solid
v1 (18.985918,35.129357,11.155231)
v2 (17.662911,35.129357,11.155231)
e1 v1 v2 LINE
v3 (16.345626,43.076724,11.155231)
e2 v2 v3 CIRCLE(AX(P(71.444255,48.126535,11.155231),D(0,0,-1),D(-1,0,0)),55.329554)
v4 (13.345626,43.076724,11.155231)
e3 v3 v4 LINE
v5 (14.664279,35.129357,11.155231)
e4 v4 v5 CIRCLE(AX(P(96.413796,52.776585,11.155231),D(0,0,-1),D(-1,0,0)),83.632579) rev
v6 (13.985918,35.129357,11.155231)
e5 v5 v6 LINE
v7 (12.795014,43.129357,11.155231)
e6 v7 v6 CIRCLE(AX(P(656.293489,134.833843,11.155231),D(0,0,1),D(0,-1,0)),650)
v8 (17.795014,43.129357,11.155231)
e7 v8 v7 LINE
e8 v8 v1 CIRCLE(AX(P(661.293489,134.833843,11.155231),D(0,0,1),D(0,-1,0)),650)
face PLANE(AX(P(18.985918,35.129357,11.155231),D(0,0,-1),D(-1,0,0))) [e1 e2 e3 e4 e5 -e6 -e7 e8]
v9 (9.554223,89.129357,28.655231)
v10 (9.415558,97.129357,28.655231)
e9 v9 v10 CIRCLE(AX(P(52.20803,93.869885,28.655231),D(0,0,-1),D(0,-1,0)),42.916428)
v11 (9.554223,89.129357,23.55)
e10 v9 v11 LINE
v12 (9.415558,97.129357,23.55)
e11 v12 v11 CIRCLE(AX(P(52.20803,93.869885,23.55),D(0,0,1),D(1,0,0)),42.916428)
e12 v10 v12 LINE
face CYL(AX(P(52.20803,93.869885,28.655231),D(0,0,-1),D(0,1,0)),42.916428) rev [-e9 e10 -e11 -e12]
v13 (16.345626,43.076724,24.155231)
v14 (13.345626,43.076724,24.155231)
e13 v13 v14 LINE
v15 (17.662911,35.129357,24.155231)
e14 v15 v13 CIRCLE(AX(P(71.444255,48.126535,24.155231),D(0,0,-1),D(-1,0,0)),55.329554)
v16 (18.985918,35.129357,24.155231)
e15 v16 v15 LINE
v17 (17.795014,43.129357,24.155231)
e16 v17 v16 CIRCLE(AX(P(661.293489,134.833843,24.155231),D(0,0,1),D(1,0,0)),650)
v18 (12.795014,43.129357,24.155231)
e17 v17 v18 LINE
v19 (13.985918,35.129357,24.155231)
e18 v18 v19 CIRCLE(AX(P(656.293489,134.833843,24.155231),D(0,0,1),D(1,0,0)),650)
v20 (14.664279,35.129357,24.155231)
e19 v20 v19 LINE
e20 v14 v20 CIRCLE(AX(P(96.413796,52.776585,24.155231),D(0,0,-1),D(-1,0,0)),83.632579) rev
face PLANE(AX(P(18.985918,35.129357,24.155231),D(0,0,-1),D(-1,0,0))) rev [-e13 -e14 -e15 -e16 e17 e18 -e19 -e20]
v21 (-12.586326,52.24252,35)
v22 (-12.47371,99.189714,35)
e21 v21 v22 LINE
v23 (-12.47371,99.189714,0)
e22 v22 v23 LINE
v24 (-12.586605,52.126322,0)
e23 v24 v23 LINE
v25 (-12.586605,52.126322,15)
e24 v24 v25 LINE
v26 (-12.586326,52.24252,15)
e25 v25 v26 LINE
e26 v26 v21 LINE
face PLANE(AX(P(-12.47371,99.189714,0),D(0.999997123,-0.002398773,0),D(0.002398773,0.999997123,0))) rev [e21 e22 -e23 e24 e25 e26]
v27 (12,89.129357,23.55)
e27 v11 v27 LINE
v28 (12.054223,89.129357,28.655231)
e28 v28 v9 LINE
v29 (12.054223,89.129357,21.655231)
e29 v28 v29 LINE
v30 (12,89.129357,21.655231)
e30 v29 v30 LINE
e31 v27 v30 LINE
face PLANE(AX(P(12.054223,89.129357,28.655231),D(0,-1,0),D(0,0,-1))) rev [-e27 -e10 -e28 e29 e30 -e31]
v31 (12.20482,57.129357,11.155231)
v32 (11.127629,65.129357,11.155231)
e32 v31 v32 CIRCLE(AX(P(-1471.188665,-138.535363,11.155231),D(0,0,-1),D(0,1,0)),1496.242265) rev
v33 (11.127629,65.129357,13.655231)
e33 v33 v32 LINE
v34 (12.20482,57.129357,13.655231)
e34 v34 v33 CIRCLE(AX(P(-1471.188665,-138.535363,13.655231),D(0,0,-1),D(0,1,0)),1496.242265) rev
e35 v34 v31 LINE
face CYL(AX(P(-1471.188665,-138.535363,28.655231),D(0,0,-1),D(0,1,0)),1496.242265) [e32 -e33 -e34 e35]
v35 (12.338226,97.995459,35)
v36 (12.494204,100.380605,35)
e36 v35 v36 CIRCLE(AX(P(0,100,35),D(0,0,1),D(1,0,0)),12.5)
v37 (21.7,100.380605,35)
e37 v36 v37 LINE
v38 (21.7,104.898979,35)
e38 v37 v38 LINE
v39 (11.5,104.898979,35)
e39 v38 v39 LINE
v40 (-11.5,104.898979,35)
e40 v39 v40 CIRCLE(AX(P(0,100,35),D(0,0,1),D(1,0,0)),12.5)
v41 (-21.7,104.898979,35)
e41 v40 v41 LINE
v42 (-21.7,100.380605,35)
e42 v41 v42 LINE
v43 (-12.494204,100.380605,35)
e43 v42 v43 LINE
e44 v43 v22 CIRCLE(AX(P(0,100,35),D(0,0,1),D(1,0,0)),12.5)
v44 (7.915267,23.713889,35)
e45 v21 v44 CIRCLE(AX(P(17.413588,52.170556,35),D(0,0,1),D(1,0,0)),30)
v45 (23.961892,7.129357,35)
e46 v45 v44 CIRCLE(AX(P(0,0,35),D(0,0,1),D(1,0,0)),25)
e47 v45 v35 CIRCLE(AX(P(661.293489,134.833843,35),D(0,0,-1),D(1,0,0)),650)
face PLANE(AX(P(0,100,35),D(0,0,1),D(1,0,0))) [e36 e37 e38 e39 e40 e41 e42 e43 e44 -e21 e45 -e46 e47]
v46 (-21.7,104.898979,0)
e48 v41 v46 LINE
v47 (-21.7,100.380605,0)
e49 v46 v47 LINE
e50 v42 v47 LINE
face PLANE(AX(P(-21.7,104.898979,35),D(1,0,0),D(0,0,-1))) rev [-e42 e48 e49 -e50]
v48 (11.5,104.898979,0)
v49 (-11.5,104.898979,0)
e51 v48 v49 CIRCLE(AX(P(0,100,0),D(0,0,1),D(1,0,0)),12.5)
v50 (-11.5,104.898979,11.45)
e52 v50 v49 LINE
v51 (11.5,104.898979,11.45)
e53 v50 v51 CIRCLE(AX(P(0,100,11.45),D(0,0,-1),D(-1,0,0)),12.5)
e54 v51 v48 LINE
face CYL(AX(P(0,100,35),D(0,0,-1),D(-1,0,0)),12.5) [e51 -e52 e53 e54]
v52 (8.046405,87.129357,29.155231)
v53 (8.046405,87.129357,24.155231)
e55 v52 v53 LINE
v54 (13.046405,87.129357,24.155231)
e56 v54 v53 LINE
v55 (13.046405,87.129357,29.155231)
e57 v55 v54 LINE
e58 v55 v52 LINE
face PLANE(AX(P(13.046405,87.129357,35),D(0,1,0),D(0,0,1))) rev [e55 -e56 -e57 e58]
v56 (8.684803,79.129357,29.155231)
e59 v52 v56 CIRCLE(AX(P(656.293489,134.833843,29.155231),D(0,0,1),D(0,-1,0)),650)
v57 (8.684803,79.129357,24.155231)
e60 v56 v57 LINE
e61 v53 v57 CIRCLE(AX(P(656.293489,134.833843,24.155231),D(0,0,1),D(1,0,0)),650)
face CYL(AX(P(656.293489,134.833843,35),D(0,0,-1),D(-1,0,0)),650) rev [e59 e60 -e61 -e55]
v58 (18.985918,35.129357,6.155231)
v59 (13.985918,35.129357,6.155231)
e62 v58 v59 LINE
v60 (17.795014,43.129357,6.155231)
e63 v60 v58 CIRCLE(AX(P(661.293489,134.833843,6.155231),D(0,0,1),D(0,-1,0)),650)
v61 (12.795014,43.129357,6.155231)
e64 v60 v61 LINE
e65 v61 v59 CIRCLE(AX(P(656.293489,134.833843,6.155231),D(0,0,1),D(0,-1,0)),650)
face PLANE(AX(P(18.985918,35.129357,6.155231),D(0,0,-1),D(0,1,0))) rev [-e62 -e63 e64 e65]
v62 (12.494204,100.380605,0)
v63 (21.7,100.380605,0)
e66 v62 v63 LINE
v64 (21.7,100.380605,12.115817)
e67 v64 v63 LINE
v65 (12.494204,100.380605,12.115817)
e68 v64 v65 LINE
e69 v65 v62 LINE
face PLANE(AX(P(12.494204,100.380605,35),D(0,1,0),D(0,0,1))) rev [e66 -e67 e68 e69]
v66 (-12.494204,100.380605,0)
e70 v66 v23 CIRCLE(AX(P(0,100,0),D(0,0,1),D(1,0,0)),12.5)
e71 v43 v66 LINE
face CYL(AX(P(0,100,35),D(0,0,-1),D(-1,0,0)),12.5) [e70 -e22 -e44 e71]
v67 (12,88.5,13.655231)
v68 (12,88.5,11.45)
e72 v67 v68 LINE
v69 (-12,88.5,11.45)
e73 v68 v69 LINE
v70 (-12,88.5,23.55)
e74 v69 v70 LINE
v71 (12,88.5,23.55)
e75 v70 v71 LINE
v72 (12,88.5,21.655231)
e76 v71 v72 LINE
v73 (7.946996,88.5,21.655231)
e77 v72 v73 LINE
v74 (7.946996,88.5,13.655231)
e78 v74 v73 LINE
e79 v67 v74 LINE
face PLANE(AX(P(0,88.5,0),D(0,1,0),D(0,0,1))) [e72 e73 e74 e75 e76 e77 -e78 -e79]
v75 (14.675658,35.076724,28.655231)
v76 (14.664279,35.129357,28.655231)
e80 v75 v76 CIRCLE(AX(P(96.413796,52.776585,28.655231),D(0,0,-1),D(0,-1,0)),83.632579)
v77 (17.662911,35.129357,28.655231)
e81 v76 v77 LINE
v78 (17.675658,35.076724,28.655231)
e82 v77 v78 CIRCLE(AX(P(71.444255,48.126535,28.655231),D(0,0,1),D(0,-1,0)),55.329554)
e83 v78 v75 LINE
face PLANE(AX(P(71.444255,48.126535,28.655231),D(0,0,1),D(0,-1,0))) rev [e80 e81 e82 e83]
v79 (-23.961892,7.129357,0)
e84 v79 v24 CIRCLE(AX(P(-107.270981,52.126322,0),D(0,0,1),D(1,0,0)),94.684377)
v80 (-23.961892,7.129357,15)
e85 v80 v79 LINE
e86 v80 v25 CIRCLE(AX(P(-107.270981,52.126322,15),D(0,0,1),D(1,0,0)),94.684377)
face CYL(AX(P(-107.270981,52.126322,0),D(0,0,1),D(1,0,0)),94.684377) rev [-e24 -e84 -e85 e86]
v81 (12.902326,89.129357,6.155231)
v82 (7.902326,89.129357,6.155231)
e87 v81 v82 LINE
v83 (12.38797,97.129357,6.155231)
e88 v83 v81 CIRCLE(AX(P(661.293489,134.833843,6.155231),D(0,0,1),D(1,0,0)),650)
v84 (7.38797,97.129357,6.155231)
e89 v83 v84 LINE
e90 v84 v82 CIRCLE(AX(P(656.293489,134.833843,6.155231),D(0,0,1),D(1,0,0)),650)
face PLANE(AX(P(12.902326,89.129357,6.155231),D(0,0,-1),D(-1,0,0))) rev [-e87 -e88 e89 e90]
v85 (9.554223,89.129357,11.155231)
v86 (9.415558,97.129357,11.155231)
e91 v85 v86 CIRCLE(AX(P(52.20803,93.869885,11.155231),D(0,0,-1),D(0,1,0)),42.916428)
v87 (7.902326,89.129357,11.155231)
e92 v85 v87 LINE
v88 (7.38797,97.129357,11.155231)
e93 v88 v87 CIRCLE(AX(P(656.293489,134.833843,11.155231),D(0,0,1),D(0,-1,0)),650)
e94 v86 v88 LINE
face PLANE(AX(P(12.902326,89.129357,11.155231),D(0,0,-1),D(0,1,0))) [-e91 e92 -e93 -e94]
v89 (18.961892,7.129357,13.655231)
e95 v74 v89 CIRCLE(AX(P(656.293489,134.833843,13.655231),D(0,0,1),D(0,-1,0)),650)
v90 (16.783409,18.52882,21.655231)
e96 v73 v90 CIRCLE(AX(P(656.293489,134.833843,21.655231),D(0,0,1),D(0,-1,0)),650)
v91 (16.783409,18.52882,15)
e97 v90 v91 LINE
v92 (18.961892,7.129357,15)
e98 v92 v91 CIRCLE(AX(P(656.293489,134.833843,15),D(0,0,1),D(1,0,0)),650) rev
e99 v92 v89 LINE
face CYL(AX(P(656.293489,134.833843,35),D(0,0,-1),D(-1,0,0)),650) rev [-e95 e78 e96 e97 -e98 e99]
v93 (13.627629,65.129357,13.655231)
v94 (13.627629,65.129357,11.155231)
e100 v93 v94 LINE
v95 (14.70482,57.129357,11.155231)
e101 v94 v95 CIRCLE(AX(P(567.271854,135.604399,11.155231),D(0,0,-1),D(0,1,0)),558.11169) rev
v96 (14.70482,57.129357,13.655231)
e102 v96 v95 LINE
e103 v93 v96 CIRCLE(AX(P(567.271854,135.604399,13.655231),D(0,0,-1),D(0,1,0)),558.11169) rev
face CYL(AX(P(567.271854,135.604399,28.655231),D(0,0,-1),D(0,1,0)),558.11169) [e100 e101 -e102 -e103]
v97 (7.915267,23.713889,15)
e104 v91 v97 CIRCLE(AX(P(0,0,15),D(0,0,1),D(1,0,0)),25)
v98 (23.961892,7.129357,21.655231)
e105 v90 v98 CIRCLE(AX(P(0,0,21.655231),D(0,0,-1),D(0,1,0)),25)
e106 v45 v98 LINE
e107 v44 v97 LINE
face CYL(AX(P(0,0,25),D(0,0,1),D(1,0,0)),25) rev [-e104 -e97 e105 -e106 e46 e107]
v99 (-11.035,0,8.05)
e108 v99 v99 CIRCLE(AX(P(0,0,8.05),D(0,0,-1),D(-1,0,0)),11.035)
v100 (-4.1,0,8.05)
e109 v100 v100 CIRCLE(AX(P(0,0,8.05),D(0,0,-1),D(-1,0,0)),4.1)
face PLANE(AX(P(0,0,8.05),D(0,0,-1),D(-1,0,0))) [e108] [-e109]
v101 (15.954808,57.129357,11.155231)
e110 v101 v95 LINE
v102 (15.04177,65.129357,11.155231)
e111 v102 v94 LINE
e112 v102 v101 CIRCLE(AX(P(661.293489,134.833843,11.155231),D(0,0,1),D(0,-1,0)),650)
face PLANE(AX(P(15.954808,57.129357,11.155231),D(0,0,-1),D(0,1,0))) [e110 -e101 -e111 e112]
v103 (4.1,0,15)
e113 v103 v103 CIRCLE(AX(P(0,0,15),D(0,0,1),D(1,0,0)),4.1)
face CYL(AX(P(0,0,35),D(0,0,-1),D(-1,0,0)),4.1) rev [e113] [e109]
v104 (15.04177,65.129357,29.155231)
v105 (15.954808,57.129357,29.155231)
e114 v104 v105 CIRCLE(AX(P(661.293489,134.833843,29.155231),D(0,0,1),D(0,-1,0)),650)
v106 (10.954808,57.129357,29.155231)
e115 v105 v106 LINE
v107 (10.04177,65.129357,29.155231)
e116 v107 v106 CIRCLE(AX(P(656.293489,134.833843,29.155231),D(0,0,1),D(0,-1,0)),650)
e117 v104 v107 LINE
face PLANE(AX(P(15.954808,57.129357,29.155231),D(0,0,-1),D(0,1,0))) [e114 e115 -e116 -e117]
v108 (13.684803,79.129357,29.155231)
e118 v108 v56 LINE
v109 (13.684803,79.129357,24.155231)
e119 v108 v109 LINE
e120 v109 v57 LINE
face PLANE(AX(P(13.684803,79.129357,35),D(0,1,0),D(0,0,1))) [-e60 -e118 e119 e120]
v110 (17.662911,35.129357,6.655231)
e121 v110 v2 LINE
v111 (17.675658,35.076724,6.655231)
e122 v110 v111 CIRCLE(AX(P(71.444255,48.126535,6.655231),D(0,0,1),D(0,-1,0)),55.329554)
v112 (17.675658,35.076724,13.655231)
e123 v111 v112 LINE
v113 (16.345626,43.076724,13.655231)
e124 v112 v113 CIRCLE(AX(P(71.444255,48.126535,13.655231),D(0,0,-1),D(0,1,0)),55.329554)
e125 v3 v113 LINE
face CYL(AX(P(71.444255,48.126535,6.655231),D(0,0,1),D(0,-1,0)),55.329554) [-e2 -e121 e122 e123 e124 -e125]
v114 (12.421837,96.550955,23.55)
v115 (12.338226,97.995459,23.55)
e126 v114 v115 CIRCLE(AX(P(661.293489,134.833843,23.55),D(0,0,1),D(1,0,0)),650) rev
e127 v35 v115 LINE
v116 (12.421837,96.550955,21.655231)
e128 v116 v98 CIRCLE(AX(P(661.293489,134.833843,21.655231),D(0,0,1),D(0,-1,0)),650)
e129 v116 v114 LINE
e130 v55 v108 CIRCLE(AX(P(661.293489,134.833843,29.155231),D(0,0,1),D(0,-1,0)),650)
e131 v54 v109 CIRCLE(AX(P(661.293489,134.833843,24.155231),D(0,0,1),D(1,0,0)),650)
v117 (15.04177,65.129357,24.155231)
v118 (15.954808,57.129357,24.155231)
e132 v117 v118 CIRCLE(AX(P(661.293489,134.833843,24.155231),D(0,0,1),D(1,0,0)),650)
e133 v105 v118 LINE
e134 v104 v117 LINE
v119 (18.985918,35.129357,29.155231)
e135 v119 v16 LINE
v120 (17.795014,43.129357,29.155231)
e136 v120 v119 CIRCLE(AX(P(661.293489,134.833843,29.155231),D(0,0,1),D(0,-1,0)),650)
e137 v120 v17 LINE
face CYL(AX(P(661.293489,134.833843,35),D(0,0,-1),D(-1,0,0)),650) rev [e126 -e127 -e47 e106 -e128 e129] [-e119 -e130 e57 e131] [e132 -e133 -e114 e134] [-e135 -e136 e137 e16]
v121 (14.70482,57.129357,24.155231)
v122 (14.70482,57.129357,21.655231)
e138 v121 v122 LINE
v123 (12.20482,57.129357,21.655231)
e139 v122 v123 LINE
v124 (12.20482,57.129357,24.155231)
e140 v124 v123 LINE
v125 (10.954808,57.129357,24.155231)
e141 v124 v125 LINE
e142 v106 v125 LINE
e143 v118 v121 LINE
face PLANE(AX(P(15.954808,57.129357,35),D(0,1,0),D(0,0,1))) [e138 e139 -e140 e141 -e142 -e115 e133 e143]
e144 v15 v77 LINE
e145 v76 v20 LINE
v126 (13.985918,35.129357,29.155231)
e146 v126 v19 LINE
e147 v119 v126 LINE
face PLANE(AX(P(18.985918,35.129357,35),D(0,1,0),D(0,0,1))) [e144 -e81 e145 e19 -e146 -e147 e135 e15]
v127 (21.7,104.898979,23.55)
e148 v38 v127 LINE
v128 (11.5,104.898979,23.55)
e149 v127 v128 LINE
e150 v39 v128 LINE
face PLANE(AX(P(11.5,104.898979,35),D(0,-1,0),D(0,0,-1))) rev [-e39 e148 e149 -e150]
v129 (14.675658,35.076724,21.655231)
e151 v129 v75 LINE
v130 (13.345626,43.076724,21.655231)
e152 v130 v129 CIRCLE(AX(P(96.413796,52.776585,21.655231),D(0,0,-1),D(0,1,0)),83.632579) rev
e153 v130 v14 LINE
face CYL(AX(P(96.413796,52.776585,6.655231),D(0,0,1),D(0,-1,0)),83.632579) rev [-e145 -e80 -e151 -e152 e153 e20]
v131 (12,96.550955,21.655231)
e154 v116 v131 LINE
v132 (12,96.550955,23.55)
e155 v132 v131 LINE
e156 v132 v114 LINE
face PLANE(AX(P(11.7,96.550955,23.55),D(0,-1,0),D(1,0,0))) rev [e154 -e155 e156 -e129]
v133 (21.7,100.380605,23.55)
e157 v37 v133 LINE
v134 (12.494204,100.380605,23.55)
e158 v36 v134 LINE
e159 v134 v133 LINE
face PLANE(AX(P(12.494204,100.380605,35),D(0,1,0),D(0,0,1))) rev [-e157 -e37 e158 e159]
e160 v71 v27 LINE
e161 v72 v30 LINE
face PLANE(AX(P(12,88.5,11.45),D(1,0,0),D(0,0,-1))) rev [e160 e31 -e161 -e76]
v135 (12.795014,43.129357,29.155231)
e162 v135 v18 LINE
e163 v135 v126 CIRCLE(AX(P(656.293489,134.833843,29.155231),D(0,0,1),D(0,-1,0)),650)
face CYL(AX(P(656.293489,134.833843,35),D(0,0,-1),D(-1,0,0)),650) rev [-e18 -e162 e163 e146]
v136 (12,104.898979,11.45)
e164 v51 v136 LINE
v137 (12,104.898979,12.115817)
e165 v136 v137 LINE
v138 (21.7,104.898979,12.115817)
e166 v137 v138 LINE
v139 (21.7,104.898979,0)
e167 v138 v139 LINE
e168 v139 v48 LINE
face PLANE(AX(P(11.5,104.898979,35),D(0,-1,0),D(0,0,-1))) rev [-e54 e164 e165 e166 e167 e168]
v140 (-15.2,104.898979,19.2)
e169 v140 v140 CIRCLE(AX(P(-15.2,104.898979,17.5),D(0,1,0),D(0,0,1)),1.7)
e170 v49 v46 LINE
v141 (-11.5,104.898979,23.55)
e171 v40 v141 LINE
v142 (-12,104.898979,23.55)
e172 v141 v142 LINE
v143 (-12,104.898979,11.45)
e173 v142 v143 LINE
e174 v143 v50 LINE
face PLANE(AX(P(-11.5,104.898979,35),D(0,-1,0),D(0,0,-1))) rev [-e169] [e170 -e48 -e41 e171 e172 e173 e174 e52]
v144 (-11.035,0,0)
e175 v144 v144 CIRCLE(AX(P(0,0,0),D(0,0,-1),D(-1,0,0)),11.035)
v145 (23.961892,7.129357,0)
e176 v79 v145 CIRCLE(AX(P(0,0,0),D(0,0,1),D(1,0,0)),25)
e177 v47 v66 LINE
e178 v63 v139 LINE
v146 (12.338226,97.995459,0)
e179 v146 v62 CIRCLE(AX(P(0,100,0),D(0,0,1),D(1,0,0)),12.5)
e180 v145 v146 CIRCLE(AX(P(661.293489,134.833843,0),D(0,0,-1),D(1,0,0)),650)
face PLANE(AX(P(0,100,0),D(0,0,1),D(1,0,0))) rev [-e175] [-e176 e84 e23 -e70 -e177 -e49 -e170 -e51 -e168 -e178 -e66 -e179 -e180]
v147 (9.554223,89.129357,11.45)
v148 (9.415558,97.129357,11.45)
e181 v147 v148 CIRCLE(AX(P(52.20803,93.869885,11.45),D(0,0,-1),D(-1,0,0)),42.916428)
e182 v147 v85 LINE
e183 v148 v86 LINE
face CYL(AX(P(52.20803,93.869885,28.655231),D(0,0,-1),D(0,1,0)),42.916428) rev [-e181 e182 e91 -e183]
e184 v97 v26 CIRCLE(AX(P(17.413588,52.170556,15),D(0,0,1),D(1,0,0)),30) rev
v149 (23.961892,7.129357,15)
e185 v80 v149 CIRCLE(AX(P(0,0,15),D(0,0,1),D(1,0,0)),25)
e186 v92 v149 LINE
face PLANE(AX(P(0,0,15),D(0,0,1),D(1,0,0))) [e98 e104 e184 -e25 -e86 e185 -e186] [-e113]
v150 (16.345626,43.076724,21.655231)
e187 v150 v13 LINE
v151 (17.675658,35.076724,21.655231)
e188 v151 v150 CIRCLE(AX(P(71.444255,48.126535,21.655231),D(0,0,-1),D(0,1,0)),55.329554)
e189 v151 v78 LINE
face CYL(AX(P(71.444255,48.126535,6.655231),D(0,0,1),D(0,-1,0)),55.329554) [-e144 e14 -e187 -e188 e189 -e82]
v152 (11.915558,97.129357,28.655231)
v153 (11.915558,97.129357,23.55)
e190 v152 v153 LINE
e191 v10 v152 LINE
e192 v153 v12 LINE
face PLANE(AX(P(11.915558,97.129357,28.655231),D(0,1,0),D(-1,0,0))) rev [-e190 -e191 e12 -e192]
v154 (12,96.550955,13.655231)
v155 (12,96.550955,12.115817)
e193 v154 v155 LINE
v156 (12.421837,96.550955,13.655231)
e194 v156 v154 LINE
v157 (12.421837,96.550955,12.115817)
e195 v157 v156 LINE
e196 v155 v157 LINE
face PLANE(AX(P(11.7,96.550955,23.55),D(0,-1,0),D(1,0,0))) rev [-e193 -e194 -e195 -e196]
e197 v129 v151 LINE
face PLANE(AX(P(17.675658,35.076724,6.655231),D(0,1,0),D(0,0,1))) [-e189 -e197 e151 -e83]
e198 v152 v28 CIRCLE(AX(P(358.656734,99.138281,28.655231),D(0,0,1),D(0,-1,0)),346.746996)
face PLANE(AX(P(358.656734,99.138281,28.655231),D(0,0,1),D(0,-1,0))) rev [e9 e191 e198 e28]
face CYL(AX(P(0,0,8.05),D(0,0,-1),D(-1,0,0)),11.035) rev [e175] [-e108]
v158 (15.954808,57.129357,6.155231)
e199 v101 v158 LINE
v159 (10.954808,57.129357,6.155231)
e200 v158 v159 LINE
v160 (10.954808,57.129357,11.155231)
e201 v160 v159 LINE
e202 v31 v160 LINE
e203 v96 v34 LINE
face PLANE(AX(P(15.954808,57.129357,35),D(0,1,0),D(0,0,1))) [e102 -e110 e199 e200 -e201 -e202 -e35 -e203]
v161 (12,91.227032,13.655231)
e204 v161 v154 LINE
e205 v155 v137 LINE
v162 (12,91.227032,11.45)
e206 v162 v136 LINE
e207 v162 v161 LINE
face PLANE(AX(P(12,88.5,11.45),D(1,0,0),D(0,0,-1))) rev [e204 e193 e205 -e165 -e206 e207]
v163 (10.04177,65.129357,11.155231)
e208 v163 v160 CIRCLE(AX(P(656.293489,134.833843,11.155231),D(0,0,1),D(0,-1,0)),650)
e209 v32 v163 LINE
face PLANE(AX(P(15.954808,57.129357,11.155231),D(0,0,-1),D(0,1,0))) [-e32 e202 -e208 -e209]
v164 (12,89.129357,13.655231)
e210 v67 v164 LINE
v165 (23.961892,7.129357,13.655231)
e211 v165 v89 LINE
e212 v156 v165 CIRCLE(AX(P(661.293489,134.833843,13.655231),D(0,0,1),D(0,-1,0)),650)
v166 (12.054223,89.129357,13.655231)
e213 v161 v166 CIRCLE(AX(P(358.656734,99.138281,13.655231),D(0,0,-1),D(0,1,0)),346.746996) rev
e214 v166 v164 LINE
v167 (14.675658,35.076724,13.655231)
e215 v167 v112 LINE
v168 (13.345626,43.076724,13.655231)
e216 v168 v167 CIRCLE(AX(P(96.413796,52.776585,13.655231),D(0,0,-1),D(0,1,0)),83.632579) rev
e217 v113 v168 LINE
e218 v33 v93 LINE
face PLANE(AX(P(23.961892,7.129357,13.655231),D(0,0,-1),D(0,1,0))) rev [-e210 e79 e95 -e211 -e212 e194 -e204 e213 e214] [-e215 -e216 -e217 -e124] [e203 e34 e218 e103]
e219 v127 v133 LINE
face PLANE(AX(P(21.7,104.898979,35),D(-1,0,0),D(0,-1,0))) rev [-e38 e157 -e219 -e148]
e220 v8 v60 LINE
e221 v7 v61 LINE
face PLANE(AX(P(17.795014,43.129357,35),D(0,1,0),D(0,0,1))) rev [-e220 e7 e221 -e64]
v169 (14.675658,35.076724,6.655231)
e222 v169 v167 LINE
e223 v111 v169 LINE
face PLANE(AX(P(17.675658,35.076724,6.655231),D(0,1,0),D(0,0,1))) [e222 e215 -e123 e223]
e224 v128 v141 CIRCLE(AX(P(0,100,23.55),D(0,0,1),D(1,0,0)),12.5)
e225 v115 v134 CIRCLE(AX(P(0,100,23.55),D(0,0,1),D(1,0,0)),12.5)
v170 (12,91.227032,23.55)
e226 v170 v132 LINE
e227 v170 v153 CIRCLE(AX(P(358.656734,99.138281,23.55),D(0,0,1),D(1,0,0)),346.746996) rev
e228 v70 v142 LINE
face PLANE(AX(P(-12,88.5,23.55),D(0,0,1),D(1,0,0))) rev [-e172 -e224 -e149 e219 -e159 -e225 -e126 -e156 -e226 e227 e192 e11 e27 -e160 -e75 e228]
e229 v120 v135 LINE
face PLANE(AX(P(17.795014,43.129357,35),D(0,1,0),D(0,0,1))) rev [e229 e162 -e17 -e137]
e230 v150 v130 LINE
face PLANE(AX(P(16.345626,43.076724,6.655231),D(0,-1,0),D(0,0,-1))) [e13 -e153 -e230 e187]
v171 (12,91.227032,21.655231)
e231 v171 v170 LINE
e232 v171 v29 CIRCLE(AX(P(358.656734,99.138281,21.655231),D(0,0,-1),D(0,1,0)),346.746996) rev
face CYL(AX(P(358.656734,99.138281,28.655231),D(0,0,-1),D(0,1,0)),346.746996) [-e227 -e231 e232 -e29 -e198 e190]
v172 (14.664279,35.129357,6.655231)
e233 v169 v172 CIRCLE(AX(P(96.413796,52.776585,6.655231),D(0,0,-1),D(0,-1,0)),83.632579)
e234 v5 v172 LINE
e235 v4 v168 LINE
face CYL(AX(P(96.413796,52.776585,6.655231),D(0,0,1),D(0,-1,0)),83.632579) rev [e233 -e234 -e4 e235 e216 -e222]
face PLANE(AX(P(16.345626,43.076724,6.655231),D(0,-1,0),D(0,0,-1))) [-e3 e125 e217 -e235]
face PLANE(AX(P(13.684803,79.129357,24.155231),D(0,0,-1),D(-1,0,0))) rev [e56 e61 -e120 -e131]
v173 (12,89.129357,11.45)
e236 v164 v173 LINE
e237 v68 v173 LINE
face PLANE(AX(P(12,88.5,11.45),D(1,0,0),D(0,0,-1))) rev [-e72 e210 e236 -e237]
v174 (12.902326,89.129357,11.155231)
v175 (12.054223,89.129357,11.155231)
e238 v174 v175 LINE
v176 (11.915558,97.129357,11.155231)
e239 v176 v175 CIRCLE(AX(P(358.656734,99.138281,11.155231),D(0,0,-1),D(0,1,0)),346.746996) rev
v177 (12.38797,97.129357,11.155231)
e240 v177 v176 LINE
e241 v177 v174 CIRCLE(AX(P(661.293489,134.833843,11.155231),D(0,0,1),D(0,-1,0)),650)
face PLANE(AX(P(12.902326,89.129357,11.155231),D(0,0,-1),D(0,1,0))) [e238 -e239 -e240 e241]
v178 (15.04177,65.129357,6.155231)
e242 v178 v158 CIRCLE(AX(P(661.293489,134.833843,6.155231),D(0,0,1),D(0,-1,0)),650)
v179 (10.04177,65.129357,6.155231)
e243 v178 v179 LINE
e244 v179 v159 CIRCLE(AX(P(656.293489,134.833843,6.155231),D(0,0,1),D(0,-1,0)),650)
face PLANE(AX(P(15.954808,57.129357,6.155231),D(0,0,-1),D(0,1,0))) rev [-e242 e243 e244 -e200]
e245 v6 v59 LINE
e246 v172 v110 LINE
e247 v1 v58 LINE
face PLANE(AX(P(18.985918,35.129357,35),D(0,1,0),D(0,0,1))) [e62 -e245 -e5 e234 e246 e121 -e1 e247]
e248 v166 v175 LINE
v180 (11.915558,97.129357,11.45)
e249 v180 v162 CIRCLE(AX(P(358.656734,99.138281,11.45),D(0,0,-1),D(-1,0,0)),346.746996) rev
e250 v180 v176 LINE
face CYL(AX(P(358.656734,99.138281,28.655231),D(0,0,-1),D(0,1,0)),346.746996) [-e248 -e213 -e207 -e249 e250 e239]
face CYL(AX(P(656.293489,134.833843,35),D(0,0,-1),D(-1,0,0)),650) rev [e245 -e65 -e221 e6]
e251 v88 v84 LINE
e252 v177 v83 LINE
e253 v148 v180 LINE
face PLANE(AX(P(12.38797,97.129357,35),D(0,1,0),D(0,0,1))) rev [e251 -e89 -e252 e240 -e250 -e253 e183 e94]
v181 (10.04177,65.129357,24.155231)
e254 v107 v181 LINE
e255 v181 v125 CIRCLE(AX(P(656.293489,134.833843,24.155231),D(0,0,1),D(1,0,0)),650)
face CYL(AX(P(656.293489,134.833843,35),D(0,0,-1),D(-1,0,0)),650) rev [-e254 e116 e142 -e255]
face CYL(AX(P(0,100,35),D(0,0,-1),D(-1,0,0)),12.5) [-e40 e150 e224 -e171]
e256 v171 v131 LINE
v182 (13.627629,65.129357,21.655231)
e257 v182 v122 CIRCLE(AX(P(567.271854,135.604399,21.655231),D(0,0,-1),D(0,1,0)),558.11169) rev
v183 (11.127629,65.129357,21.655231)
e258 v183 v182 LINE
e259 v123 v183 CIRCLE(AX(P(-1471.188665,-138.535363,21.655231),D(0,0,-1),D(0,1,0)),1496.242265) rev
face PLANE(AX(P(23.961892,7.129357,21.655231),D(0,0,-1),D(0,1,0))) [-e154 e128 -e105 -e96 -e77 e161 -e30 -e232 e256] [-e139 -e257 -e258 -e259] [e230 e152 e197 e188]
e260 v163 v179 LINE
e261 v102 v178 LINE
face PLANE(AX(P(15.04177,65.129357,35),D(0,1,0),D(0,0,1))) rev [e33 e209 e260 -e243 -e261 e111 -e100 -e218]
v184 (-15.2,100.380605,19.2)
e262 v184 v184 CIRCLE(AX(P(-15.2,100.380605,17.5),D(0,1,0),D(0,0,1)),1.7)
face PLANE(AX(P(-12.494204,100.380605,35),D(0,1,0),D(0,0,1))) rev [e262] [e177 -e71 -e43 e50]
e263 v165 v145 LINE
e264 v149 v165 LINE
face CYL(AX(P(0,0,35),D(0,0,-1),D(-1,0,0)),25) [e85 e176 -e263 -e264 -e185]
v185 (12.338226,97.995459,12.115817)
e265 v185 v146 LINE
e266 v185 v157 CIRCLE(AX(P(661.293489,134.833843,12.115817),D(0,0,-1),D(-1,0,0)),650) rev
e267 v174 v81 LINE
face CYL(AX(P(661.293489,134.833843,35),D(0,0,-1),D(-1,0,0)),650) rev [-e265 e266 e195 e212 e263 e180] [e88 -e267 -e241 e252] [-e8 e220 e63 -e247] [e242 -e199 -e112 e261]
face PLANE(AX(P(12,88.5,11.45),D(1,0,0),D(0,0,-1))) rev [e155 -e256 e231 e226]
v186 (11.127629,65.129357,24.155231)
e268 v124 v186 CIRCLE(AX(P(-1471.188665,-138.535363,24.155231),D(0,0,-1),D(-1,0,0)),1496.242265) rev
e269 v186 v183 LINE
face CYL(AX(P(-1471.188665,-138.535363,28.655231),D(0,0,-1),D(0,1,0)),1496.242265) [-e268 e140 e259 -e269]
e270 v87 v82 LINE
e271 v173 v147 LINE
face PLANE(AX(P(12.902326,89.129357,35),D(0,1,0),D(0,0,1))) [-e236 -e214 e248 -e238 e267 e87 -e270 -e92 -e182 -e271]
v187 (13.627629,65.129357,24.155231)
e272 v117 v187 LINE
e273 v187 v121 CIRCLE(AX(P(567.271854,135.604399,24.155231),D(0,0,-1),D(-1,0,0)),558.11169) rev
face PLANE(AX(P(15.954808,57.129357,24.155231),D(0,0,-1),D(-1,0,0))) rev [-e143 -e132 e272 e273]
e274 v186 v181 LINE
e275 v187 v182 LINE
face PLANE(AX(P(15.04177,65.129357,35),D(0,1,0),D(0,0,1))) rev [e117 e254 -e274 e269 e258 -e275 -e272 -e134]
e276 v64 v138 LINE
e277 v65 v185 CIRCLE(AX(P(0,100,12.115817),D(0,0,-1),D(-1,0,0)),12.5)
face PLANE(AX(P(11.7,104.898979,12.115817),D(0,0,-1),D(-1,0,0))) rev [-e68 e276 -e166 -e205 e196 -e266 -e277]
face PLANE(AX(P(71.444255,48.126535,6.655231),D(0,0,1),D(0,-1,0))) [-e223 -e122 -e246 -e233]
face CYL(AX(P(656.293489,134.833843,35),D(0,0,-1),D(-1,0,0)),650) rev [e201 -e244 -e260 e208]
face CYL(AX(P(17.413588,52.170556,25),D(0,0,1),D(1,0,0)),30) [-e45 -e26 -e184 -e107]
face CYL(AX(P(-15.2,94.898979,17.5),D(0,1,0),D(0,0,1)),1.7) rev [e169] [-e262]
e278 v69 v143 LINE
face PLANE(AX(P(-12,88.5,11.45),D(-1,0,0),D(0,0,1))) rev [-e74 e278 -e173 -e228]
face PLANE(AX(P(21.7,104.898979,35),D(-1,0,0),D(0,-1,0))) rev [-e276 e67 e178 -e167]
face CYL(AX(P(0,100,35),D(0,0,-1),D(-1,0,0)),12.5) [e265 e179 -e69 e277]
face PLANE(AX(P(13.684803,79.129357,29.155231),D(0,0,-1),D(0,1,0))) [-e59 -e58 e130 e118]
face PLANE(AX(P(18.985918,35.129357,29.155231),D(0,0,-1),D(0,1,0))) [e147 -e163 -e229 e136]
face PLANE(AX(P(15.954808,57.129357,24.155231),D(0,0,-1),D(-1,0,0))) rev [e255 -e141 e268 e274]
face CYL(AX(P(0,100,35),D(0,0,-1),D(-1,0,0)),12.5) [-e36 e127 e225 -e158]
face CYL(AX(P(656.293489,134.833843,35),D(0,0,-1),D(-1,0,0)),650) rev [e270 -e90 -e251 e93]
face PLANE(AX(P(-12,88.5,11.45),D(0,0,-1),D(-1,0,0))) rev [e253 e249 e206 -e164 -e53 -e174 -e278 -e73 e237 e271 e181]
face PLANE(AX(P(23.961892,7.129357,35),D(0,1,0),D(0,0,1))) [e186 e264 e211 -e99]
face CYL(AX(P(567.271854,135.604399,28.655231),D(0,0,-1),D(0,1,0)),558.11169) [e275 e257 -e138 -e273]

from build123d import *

# Parameters (mm, degrees)
CROQUIS2_R                  = 4.1
SALIENTE_EXTRUIR1_DEPTH     = 35
CROQUIS3_W                  = 24
CROQUIS3_H                  = 12.1
CORTAR_EXTRUIR1_DEPTH       = 24
CROQUIS9_R                  = 1.7
CORTAR_EXTRUIR2_DEPTH       = 10
CORTAR_EXTRUIR3_START       = -10
CROQUIS11_R                 = 25
CORTAR_EXTRUIR3_DEPTH       = 10
CORTAR_EXTRUIR5_START       = 13.655231177
CORTAR_EXTRUIR5_DEPTH       = 8
CORTAR_EXTRUIR5_START_2     = 6.155231177
CORTAR_EXTRUIR5_2_DEPTH     = 5
CORTAR_EXTRUIR5_START_3     = 24.155231177
CORTAR_EXTRUIR5_3_DEPTH     = 5
CORTAR_EXTRUIR6_START       = -10
CROQUIS13_R                 = 25
CORTAR_EXTRUIR6_DEPTH       = 10
CROQUIS14_R                 = 11.035
CORTAR_EXTRUIR7_DEPTH       = 8.05
CORTAR_EXTRUIR8_DEPTH       = 15
CORTAR_EXTRUIR8_DEPTH_BACK  = 7
CORTAR_EXTRUIR9_DEPTH       = 15
CORTAR_EXTRUIR9_DEPTH_BACK  = 7
CORTAR_EXTRUIR10_DEPTH      = 15
CORTAR_EXTRUIR10_DEPTH_BACK = 7
CORTAR_EXTRUIR11_DEPTH      = 121.441894704
REDONDEO1_R                 = 30
CROQUIS22_W                 = 11.434183309
CROQUIS22_H                 = 8.348024574
CORTAR_EXTRUIR12_DEPTH      = 10


# Read off the part's stored shape, not the designer's step: Cortar-Extruir5
with BuildPart() as part:
    # Croquis2 → Saliente-Extruir1 (new body)
    with BuildSketch(Plane.XY):
        with BuildLine():
            Line((-11.5, 104.898979486), (-21.7, 104.898979486))
            Line((-21.7, 104.898979486), (-21.7, 100.380604651))
            Line((-21.7, 100.380604651), (-12.49420426, 100.380604651))
            ThreePointArc((-12.49420426, 100.380604651), (-12.498149406, 99.784915281), (-12.473709842, 99.189714392))
            ThreePointArc((-12.473709842, 99.189714392), (-16.573234399, 52.954310766), (-23.961892015, 7.129356989))
            ThreePointArc((-23.961892015, 7.129356989), (0, -25), (23.961892015, 7.129356989))
            ThreePointArc((23.961892015, 7.129356989), (16.547311175, 52.357383104), (12.33822575, 97.995458822))
            ThreePointArc((12.33822575, 97.995458822), (12.473356614, 99.184294915), (12.49420426, 100.380604651))
            Line((12.49420426, 100.380604651), (21.7, 100.380604651))
            Line((21.7, 100.380604651), (21.7, 104.898979486))
            Line((21.7, 104.898979486), (11.5, 104.898979486))
            ThreePointArc((11.5, 104.898979486), (0, 112.5), (-11.5, 104.898979486))
        make_face()
        Circle(CROQUIS2_R, mode=Mode.SUBTRACT)
    extrude(amount=SALIENTE_EXTRUIR1_DEPTH)

    # Croquis3 → Cortar-Extruir1 (cut)
    with BuildSketch(Plane(origin=(0, 112.5, 0), x_dir=(1, 0, 0), z_dir=(0, 1, 0))):
        with Locations((0, -17.5)):
            Rectangle(CROQUIS3_W, CROQUIS3_H)
    extrude(amount=-CORTAR_EXTRUIR1_DEPTH, mode=Mode.SUBTRACT)

    # Croquis9 → Cortar-Extruir2 (cut)
    with BuildSketch(Plane(origin=(0, 104.898979486, 0), x_dir=(1, 0, 0), z_dir=(0, 1, 0))):
        with Locations(Location((-15.2, -17.5, 0), (0, 0, 270))):
            Circle(CROQUIS9_R)
        with Locations(Location((15.2, -17.5, 0), (0, 0, 270))):
            Circle(CROQUIS9_R)
    extrude(amount=-CORTAR_EXTRUIR2_DEPTH, mode=Mode.SUBTRACT)

    # Croquis11 → Cortar-Extruir3 (cut)
    with BuildSketch(Plane.XY.offset(35).offset(CORTAR_EXTRUIR3_START)):
        Circle(CROQUIS11_R)
    extrude(amount=CORTAR_EXTRUIR3_DEPTH, mode=Mode.SUBTRACT)

    # Cortar-Extruir5 outline → Cortar-Extruir5 (cut)
    with BuildSketch(Plane.XY.offset(CORTAR_EXTRUIR5_START)):
        with BuildLine():
            Line((12.387970466, 97.129356989), (12, 97.129356989))
            Line((12, 97.129356989), (12, 88.5))
            Line((12, 88.5), (7.946995801, 88.5))
            ThreePointArc((7.946995801, 88.5), (12.16824242, 47.640569315), (18.961892015, 7.129356989))
            Line((18.961892015, 7.129356989), (23.961892015, 7.129356989))
            ThreePointArc((23.961892015, 7.129356989), (16.602493766, 51.9271429), (12.387970466, 97.129356989))
        make_face()
    extrude(amount=CORTAR_EXTRUIR5_DEPTH, mode=Mode.SUBTRACT)

    # Cortar-Extruir5 2 outline → Cortar-Extruir5 2 (cut)
    with BuildSketch(Plane.XY.offset(CORTAR_EXTRUIR5_START_2)):
        with BuildLine():
            ThreePointArc((12.902326037, 89.129356989), (12.63281503, 93.128564031), (12.387970466, 97.129356989))
            Line((12.387970466, 97.129356989), (7.387970466, 97.129356989))
            ThreePointArc((7.387970466, 97.129356989), (7.63281503, 93.128564031), (7.902326037, 89.129356989))
            Line((7.902326037, 89.129356989), (12.902326037, 89.129356989))
        make_face()
        with BuildLine():
            ThreePointArc((15.954808066, 57.129356989), (15.485901101, 61.127943182), (15.041769556, 65.129356989))
            Line((15.041769556, 65.129356989), (10.041769556, 65.129356989))
            ThreePointArc((10.041769556, 65.129356989), (10.485901101, 61.127943182), (10.954808066, 57.129356989))
            Line((10.954808066, 57.129356989), (15.954808066, 57.129356989))
        make_face()
        with BuildLine():
            ThreePointArc((18.985918027, 35.129356989), (18.378022509, 39.127504621), (17.795013863, 43.129356989))
            Line((17.795013863, 43.129356989), (12.795013863, 43.129356989))
            ThreePointArc((12.795013863, 43.129356989), (13.378022509, 39.127504621), (13.985918027, 35.129356989))
            Line((13.985918027, 35.129356989), (18.985918027, 35.129356989))
        make_face()
    extrude(amount=CORTAR_EXTRUIR5_2_DEPTH, mode=Mode.SUBTRACT)

    # Cortar-Extruir5 3 outline → Cortar-Extruir5 3 (cut)
    with BuildSketch(Plane.XY.offset(CORTAR_EXTRUIR5_START_3)):
        with BuildLine():
            ThreePointArc((13.684802762, 79.129356989), (13.35325681, 83.128371707), (13.046404729, 87.129356989))
            Line((13.046404729, 87.129356989), (8.046404729, 87.129356989))
            ThreePointArc((8.046404729, 87.129356989), (8.35325681, 83.128371707), (8.684802762, 79.129356989))
            Line((8.684802762, 79.129356989), (13.684802762, 79.129356989))
        make_face()
        with BuildLine():
            ThreePointArc((15.954808066, 57.129356989), (15.485901101, 61.127943182), (15.041769556, 65.129356989))
            Line((15.041769556, 65.129356989), (10.041769556, 65.129356989))
            ThreePointArc((10.041769556, 65.129356989), (10.485901101, 61.127943182), (10.954808066, 57.129356989))
            Line((10.954808066, 57.129356989), (15.954808066, 57.129356989))
        make_face()
        with BuildLine():
            ThreePointArc((18.985918027, 35.129356989), (18.378022509, 39.127504621), (17.795013863, 43.129356989))
            Line((17.795013863, 43.129356989), (12.795013863, 43.129356989))
            ThreePointArc((12.795013863, 43.129356989), (13.378022509, 39.127504621), (13.985918027, 35.129356989))
            Line((13.985918027, 35.129356989), (18.985918027, 35.129356989))
        make_face()
    extrude(amount=CORTAR_EXTRUIR5_3_DEPTH, mode=Mode.SUBTRACT)

    # Croquis13 → Cortar-Extruir6 (cut)
    with BuildSketch(Plane.XY.offset(25).offset(CORTAR_EXTRUIR6_START)):
        Circle(CROQUIS13_R)
    extrude(amount=CORTAR_EXTRUIR6_DEPTH, mode=Mode.SUBTRACT)

    # Croquis14 → Cortar-Extruir7 (cut)
    with BuildSketch(Plane(origin=(0, 0, 0), x_dir=(-1, 0, 0), z_dir=(0, 0, -1))):
        Circle(CROQUIS14_R)
    extrude(amount=-CORTAR_EXTRUIR7_DEPTH, mode=Mode.SUBTRACT)

    # Croquis16 → Cortar-Extruir8 (cut, two sides: drawn at the far end of the back side and taken through both)
    with BuildSketch(Plane(origin=(0, 0, 21.655231177), x_dir=(-1, 0, 0), z_dir=(0, 0, -1)).offset(-CORTAR_EXTRUIR8_DEPTH_BACK)):
        with BuildLine():
            Line((-13.627629456, 65.129356989), (-11.127629456, 65.129356989))
            ThreePointArc((-11.127629456, 65.129356989), (-11.671619883, 61.130083418), (-12.204820334, 57.129356989))
            Line((-12.204820334, 57.129356989), (-14.704820334, 57.129356989))
            ThreePointArc((-14.704820334, 57.129356989), (-14.1517613, 61.127409483), (-13.627629456, 65.129356989))
        make_face()
    extrude(amount=CORTAR_EXTRUIR8_DEPTH + CORTAR_EXTRUIR8_DEPTH_BACK, mode=Mode.SUBTRACT)

    # Croquis17 → Cortar-Extruir9 (cut, two sides: drawn at the far end of the back side and taken through both)
    with BuildSketch(Plane(origin=(0, 0, 21.655231177), x_dir=(-1, 0, 0), z_dir=(0, 0, -1)).offset(-CORTAR_EXTRUIR9_DEPTH_BACK)):
        with BuildLine():
            Line((-11.915557759, 97.129356989), (-9.415557759, 97.129356989))
            ThreePointArc((-9.415557759, 97.129356989), (-9.298046866, 93.126118397), (-9.554223154, 89.129356989))
            Line((-9.554223154, 89.129356989), (-12.054223154, 89.129356989))
            ThreePointArc((-12.054223154, 89.129356989), (-11.961814646, 93.128957012), (-11.915557759, 97.129356989))
        make_face()
    extrude(amount=CORTAR_EXTRUIR9_DEPTH + CORTAR_EXTRUIR9_DEPTH_BACK, mode=Mode.SUBTRACT)

    # Croquis18 → Cortar-Extruir10 (cut, two sides: drawn at the far end of the back side and taken through both)
    with BuildSketch(Plane(origin=(0, 0, 21.655231177), x_dir=(-1, 0, 0), z_dir=(0, 0, -1)).offset(-CORTAR_EXTRUIR10_DEPTH_BACK)):
        with BuildLine():
            Line((-16.345625555, 43.076723993), (-13.345625555, 43.076723993))
            ThreePointArc((-13.345625555, 43.076723993), (-13.91361536, 39.060592935), (-14.675658247, 35.076723993))
            Line((-14.675658247, 35.076723993), (-17.675658247, 35.076723993))
            ThreePointArc((-17.675658247, 35.076723993), (-16.863871756, 39.052322857), (-16.345625555, 43.076723993))
        make_face()
    extrude(amount=CORTAR_EXTRUIR10_DEPTH + CORTAR_EXTRUIR10_DEPTH_BACK, mode=Mode.SUBTRACT)

    # Croquis21 → Cortar-Extruir11 (cut, through all)
    with BuildSketch(Plane.XY.offset(35)):
        with BuildLine():
            Line((-12.473709842, 99.189714392), (-12.586604544, 52.126321873))
            ThreePointArc((-12.586604544, 52.126321873), (-15.474466118, 28.920051094), (-23.961892015, 7.129356989))
            Line((-23.961892015, 7.129356989), (-12.473709842, 99.189714392))
        make_face()
    extrude(amount=-CORTAR_EXTRUIR11_DEPTH, mode=Mode.SUBTRACT)

    # Redondeo1
    # the kernel refuses this fillet: 30 mm, written as the material it takes off along each edge
    with BuildSketch(Plane(origin=(-20.412546923, 14.433569486, 131.323871826), x_dir=(0.9503032831385696, 0.3113256655916044, 0), z_dir=(0, 0, -1))) as redondeo1_piece_1:
        with BuildLine():
            CenterArc((47.69462314, -24.085461873), REDONDEO1_R, 126.596996469, 71.521785283)
            ThreePointArc((19.182207947, -33.41510173), (11.30875316, -15.721520532), (0, 0))
            ThreePointArc((0, 0), (14.904569731, -4.928781773), (29.809139462, 0))
        make_face()
    extrude(amount=116.323871826, mode=Mode.SUBTRACT)

    # Croquis22 → Cortar-Extruir12 (cut)
    with BuildSketch(Plane(origin=(21.7, 0, 0), x_dir=(0, 0, -1), z_dir=(1, 0, 0))):
        with Locations((-17.832908346, 100.724967199)):
            Rectangle(CROQUIS22_W, CROQUIS22_H)
    extrude(amount=-CORTAR_EXTRUIR12_DEPTH, mode=Mode.SUBTRACT)


solid = part.part
